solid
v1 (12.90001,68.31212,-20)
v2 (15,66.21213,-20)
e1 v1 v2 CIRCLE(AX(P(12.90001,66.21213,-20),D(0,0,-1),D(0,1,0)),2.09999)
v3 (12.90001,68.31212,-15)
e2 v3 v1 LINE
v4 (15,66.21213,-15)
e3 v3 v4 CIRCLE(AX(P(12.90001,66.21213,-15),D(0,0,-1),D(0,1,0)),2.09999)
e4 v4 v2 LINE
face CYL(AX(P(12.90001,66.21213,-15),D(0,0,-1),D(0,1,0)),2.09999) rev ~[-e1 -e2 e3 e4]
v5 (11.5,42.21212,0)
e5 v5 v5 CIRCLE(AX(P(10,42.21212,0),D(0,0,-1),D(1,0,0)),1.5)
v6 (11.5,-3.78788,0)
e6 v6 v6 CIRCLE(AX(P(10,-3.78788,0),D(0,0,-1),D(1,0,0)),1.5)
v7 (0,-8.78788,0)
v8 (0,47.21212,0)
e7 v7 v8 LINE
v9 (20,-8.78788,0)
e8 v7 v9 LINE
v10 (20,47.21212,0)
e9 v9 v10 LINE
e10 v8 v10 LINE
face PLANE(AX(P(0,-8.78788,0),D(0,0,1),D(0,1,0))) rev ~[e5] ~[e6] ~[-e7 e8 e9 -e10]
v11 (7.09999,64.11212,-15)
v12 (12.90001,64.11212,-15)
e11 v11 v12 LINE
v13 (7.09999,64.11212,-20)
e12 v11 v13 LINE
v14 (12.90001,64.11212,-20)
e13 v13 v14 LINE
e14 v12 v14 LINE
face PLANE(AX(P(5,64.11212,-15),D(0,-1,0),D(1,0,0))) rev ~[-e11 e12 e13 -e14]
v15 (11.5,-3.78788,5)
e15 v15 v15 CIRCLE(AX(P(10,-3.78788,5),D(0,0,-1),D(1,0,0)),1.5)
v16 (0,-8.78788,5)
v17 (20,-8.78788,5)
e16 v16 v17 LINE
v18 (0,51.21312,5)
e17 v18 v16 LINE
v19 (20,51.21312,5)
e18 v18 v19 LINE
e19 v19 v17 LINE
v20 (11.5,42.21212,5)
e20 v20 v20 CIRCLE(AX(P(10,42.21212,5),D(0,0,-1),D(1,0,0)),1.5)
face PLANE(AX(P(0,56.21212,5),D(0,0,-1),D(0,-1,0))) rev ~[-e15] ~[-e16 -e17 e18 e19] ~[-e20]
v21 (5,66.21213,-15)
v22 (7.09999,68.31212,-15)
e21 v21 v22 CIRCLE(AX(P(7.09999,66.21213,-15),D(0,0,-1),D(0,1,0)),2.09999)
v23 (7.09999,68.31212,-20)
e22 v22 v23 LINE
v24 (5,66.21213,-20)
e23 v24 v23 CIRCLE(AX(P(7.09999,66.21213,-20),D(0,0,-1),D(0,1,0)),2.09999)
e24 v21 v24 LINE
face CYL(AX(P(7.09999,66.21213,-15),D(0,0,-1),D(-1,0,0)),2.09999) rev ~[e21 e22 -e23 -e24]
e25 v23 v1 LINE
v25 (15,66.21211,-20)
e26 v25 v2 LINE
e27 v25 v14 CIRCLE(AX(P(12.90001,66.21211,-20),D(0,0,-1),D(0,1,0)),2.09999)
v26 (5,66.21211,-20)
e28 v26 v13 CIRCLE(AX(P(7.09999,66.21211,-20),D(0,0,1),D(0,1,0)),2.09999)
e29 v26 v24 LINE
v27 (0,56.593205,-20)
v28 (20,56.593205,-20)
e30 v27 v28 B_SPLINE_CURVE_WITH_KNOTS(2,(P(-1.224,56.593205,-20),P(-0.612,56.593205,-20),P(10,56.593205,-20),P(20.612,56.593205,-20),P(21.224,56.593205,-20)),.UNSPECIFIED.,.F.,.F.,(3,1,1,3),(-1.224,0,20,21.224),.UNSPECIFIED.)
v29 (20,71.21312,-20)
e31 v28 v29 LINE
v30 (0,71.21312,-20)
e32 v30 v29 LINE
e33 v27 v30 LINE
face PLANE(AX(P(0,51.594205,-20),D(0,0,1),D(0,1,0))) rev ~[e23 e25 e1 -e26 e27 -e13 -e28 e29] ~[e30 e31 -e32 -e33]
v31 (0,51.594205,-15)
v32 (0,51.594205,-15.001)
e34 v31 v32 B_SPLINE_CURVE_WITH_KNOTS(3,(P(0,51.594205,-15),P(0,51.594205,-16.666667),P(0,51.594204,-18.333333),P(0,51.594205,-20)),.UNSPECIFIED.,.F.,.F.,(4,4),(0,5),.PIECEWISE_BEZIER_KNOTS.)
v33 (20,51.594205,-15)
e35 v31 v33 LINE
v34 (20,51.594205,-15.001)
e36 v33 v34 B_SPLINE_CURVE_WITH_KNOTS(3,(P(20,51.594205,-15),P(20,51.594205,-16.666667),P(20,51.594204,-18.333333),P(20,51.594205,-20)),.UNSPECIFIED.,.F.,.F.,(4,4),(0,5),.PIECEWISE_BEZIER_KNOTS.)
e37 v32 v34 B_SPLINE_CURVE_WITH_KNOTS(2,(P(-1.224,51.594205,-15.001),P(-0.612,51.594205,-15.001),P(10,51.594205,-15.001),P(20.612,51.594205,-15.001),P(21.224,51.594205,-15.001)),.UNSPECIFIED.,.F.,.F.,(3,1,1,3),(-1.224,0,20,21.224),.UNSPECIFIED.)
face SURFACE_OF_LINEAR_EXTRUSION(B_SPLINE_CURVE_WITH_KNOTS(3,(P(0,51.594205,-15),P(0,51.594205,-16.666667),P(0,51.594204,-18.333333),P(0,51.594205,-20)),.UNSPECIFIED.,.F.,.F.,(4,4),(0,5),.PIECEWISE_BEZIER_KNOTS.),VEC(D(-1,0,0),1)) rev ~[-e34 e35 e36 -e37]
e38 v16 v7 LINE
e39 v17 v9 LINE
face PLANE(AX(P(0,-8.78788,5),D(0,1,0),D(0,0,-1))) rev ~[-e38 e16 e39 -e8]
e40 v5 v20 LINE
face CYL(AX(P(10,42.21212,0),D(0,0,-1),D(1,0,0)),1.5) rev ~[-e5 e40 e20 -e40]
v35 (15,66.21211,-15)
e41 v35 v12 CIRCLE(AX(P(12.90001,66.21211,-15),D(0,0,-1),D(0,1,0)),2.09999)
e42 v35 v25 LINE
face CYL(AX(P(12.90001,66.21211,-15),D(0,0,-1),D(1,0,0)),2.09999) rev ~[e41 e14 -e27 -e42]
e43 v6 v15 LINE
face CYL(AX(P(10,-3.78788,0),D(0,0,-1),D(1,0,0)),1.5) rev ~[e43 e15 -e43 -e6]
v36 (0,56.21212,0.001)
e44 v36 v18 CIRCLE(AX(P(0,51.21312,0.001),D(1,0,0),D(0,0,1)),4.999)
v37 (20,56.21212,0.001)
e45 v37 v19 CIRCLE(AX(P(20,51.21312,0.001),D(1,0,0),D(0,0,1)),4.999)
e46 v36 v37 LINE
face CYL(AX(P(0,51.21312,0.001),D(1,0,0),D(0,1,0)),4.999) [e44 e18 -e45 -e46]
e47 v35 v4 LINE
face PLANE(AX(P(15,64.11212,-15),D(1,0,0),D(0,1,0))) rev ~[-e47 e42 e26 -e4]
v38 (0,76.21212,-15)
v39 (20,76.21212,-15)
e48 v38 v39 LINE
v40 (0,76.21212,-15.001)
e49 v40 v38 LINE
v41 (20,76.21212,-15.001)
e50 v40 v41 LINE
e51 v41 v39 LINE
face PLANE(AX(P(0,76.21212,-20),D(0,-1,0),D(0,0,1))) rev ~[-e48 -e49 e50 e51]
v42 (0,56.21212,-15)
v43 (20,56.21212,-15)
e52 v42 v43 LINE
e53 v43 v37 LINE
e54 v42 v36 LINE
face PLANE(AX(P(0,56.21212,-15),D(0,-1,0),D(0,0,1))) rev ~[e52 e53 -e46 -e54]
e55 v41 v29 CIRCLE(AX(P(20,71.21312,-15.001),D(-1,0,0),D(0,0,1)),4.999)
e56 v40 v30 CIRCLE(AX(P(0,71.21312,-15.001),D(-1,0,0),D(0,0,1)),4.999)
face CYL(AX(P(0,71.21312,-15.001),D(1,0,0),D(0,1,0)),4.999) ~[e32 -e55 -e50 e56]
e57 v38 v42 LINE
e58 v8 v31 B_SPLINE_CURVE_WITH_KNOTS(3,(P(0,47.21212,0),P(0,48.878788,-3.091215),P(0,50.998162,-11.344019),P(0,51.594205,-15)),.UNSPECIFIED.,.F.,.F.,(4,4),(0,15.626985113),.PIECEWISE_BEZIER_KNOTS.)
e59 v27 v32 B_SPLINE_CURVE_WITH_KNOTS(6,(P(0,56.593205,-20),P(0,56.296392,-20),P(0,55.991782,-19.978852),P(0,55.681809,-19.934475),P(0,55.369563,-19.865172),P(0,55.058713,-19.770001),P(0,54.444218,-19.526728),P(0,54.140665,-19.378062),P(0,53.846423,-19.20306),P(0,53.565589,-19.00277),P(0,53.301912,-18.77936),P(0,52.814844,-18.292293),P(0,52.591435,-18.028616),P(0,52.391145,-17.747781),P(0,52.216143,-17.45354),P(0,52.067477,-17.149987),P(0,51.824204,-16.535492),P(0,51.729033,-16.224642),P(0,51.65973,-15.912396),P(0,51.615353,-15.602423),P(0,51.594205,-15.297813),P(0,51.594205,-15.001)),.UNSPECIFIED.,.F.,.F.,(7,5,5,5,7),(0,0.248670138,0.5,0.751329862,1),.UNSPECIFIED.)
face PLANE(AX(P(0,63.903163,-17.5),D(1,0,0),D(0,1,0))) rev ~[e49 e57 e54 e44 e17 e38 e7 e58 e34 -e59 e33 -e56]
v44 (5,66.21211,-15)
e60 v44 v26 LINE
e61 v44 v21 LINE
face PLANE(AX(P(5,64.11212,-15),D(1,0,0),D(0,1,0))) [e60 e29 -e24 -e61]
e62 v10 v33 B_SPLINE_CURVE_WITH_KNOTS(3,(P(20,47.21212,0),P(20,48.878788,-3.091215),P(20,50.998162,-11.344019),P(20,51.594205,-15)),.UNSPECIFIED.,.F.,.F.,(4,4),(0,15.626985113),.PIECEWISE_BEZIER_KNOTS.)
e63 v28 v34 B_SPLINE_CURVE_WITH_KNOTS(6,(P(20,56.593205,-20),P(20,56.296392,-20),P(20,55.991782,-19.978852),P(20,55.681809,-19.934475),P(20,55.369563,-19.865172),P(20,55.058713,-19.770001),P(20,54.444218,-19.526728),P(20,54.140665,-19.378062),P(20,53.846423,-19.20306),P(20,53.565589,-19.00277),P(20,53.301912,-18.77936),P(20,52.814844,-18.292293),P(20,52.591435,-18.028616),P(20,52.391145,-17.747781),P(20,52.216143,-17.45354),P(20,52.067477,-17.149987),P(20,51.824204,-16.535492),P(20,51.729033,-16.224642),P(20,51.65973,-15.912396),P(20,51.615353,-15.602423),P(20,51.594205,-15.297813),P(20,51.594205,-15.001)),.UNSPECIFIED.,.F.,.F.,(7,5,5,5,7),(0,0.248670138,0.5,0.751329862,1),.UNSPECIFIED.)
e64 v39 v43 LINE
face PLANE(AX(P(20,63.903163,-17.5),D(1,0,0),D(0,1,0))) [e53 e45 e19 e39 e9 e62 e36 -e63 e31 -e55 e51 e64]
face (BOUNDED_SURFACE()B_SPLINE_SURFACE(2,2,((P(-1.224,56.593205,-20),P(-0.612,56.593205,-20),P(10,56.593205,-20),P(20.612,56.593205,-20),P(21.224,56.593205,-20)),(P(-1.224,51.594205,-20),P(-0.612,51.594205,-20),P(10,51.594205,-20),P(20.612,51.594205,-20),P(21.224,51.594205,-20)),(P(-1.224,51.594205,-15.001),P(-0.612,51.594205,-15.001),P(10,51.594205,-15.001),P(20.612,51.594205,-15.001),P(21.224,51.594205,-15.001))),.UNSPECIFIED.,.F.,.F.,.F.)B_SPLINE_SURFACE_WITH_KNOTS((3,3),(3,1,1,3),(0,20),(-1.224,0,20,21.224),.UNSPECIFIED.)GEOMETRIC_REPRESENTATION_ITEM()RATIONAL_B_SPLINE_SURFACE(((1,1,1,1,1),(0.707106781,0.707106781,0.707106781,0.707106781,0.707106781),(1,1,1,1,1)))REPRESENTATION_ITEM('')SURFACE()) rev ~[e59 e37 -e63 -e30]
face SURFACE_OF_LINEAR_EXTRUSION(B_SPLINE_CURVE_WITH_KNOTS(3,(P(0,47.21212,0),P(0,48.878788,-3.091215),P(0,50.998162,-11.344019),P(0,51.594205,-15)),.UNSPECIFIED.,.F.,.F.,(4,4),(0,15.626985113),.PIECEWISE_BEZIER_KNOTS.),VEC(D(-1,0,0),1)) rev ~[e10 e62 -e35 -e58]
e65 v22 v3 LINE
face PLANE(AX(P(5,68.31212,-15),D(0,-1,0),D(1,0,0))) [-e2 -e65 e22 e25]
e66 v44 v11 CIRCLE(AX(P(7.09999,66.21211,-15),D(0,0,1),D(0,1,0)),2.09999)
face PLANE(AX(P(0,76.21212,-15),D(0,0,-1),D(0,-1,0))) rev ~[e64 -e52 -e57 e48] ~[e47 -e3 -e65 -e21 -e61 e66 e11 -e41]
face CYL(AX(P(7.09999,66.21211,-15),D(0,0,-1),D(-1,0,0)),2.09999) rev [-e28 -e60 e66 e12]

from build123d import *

# Parameters (mm, degrees)
F1_DEPTH = 20
F2_R     = 1.5
F3_DEPTH = 5
F4_W     = 10
F4_H     = 4.2
F5_DEPTH = 5
F6_R     = 2.09999
F7_R     = 4.999


# Not quite as in the source:
# - a fillet or chamfer is up to 0.001 mm smaller than in the source, because OpenCascade refuses the exact size


with BuildPart() as f1:
    # F0 (on Right) → F1 (new body)
    with BuildSketch(Plane.YZ):
        with BuildLine():
            Line((76.2121204979, -15), (56.2121204979, -15))
            Line((56.2121204979, -15), (51.5942049014, -15))
            add(Edge.make_bspline(
                [(51.5942049014, -15), (51.5942049014, -16.6666666667), (51.5942043035, -18.3333333333), (51.5942049014, -20)],
                knots=[0, 0, 0, 0, 5, 5, 5, 5], degree=3))
            Line((51.5942049014, -20), (76.2121204979, -20))
            Line((76.2121204979, -20), (76.2121204979, -15))
        make_face()
        with BuildLine():
            Line((56.2121204979, -15), (56.2121204979, 0))
            Line((56.2121204979, 0), (47.2121204979, 0))
            add(Edge.make_bspline(
                [(47.2121204979, 0), (48.878788136, -3.0912153851), (50.9981620768, -11.3440190259), (51.5942049014, -15)],
                knots=[0, 0, 0, 0, 15.6269851129, 15.6269851129, 15.6269851129, 15.6269851129], degree=3))
            Line((51.5942049014, -15), (56.2121204979, -15))
        make_face()
        Polygon((56.2121204979, 0), (56.2121204979, 5), (-8.7878795021, 5), (-8.7878795021, 0), (47.2121204979, 0), align=None)
    extrude(amount=F1_DEPTH)

    # F2 (on face) → F3 (cut)
    with BuildSketch(Plane(origin=(0, 0, 0), x_dir=(1, 0, 0), z_dir=(0, 0, -1))):
        with Locations((10, -42.2121204979)):
            Circle(F2_R)
        with Locations((10, 3.7878795021)):
            Circle(F2_R)
    extrude(amount=-F3_DEPTH, mode=Mode.SUBTRACT)

    # F4 (on face) → F5 (cut)
    with BuildSketch(Plane.XY.offset(-15)):
        with Locations((10, 66.2121204979)):
            Rectangle(F4_W, F4_H)
    extrude(amount=-F5_DEPTH, mode=Mode.SUBTRACT)

    # F6 (radius 2.1 in the source; OpenCascade refuses exactly that, so slightly less here)
    f6_edges = [f1.edges().sort_by_distance(p)[0] for p in [
        (5, 68.31212, -17.5),
        (15, 68.31212, -17.5),
        (15, 64.11212, -17.5),
        (5, 64.11212, -17.5),
    ]]
    fillet(f6_edges, radius=F6_R)

    # F7 (radius 5 in the source; OpenCascade refuses exactly that, so slightly less here)
    f7_edges = [f1.edges().sort_by_distance(p)[0] for p in [
        (10, 56.21212, 5),
        (10, 76.21212, -20),
        (10, 51.594205, -20),
    ]]
    fillet(f7_edges, radius=F7_R)


solid = f1.part
